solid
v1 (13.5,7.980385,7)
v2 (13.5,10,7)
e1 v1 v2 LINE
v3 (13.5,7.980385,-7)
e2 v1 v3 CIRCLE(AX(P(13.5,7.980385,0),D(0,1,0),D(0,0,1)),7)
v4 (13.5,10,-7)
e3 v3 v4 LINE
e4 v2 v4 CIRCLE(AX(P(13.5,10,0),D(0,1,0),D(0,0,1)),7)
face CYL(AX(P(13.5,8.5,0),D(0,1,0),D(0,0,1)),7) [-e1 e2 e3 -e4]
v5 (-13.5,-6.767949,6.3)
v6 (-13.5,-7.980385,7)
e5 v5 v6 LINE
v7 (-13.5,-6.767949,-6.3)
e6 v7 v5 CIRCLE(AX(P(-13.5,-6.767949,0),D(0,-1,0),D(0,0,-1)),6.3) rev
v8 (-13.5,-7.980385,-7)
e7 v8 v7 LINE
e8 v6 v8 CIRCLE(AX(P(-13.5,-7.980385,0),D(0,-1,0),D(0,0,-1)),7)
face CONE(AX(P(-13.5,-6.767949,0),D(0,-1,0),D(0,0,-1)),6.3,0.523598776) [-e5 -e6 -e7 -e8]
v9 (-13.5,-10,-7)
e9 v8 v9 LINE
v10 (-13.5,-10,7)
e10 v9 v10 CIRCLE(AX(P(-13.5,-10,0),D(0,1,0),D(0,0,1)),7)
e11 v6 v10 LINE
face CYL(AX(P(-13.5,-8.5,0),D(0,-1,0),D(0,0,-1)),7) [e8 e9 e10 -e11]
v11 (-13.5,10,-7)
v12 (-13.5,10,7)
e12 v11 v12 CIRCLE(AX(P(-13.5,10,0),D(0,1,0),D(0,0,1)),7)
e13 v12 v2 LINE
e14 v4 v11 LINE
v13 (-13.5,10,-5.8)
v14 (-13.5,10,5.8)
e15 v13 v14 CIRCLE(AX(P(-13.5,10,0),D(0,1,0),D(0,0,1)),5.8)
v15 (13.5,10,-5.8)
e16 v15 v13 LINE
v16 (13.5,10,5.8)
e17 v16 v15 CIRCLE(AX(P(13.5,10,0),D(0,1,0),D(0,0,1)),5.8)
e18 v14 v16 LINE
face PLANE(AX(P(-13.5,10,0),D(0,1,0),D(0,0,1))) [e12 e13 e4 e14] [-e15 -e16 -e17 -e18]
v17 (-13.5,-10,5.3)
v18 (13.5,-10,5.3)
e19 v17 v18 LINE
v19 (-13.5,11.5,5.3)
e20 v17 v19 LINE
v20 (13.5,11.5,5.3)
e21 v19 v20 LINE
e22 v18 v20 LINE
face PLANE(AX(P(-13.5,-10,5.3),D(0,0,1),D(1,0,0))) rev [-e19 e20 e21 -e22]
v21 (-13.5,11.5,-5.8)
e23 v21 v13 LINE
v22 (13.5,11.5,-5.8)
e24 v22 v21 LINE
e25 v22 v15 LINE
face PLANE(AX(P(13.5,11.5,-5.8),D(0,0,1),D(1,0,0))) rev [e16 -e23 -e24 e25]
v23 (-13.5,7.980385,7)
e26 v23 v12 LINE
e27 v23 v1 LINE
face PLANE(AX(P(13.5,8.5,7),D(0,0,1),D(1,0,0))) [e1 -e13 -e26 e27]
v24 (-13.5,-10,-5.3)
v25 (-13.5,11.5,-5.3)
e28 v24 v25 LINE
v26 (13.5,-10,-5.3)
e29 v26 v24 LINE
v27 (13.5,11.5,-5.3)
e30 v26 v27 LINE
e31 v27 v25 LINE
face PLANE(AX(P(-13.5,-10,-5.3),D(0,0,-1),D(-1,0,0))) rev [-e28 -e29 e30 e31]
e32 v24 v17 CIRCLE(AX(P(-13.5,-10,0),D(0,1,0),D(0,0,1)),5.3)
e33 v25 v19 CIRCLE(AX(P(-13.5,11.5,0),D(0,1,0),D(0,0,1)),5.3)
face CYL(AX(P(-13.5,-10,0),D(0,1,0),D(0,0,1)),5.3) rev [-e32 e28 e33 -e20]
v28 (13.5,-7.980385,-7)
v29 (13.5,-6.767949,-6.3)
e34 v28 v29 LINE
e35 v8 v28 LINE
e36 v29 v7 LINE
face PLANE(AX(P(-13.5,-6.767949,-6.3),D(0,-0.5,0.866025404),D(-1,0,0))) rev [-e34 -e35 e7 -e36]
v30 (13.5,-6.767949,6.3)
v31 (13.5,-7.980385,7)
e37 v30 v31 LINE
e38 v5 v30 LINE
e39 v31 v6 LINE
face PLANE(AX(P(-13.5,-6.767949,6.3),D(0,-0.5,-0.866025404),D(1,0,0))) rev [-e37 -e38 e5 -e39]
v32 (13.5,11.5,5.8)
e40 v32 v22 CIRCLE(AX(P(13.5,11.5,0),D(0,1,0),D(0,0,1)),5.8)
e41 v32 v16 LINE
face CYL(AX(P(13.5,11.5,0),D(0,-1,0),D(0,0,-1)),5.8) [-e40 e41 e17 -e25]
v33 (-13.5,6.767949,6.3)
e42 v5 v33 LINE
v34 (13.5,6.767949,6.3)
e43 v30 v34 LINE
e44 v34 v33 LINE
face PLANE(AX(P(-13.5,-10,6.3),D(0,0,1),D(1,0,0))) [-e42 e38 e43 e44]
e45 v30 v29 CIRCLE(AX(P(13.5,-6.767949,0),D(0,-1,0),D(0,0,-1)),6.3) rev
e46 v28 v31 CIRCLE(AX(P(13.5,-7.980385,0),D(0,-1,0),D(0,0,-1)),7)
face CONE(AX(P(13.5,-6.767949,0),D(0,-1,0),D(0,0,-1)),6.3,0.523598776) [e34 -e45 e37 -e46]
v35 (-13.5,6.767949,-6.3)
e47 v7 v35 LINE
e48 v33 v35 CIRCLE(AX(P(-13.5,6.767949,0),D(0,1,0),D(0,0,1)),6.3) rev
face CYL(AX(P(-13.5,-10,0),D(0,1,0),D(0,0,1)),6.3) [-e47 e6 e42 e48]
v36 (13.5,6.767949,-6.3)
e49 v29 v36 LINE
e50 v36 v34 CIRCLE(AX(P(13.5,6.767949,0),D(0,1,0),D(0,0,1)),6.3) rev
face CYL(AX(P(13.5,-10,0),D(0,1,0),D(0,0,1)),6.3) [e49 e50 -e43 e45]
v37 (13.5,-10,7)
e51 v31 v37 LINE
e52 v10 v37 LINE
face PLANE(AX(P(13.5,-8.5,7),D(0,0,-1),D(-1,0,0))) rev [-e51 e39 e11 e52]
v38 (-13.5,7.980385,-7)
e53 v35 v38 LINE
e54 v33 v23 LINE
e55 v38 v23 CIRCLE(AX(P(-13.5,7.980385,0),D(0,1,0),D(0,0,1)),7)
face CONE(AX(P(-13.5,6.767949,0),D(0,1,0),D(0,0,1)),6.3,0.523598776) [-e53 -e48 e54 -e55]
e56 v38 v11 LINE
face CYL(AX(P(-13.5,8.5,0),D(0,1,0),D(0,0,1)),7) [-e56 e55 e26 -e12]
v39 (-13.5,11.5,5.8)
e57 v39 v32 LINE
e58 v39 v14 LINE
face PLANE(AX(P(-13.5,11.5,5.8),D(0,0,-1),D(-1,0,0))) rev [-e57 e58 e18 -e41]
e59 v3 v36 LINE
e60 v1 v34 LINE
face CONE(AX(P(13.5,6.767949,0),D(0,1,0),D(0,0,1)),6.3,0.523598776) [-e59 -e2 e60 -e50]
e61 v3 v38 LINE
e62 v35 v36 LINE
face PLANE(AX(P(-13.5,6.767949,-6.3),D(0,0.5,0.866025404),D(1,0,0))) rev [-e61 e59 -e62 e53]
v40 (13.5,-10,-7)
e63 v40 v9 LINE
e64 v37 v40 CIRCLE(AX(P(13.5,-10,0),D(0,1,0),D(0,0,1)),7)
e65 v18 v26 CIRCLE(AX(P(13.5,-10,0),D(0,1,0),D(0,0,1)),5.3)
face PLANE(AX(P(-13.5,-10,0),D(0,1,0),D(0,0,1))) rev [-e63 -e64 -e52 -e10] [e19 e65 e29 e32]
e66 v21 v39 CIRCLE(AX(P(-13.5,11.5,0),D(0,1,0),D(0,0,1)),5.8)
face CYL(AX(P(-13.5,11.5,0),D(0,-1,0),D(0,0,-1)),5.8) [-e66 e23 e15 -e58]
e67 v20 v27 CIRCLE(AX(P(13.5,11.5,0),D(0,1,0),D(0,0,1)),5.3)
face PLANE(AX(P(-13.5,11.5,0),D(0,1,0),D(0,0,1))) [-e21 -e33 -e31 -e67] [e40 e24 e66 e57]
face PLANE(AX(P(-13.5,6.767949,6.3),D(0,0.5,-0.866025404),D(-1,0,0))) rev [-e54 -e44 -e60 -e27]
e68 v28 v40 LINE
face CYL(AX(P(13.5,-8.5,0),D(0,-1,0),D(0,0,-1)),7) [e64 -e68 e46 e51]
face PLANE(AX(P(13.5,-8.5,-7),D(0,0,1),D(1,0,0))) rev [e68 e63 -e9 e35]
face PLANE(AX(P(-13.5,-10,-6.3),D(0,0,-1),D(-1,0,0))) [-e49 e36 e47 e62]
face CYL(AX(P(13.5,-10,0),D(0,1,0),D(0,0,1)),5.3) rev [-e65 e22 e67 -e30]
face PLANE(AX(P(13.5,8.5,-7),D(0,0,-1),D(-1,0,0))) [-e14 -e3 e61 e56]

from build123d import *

# Parameters (mm, degrees)
BOSS_EXTRUDE1_DEPTH      = 10
BOSS_EXTRUDE1_DEPTH_BACK = 10
BOSS_EXTRUDE2_START      = -1.5
BOSS_EXTRUDE2_DEPTH      = 1.5
BOSS_EXTRUDE3_DEPTH      = 1.5
CHAMFER1_SIZE            = 1
CHAMFER1_SIZE_2          = 1.732050808


with BuildPart() as part:
    # Sketch1 → Boss-Extrude1 (new, two sides: drawn at the far end of the back side and taken through both)
    with BuildSketch(Plane(origin=(0, 0, 0), x_dir=(1, 0, 0), z_dir=(0, 1, 0)).offset(-BOSS_EXTRUDE1_DEPTH_BACK)):
        with BuildLine():
            Line((-13.5, 6.3), (13.5, 6.3))
            ThreePointArc((13.5, 6.3), (19.8, 0), (13.5, -6.3))
            Line((13.5, -6.3), (-13.5, -6.3))
            ThreePointArc((-13.5, -6.3), (-19.8, 0), (-13.5, 6.3))
        make_face()
        with BuildLine():
            Line((-13.5, 5.3), (13.5, 5.3))
            ThreePointArc((13.5, 5.3), (18.8, 0), (13.5, -5.3))
            Line((13.5, -5.3), (-13.5, -5.3))
            ThreePointArc((-13.5, -5.3), (-18.8, 0), (-13.5, 5.3))
        make_face(mode=Mode.SUBTRACT)
    extrude(amount=BOSS_EXTRUDE1_DEPTH + BOSS_EXTRUDE1_DEPTH_BACK)

    # Sketch2 → Boss-Extrude2 (add)
    with BuildSketch(Plane(origin=(0, 10, 0), x_dir=(1, 0, 0), z_dir=(0, 1, 0)).offset(BOSS_EXTRUDE2_START)):
        with BuildLine():
            Line((13.5, -7), (-13.5, -7))
            ThreePointArc((-13.5, -7), (-20.5, 0), (-13.5, 7))
            Line((-13.5, 7), (13.5, 7))
            ThreePointArc((13.5, 7), (20.5, 0), (13.5, -7))
        make_face()
        with BuildLine():
            Line((-13.5, -5.3), (13.5, -5.3))
            ThreePointArc((13.5, -5.3), (18.8, 0), (13.5, 5.3))
            Line((13.5, 5.3), (-13.5, 5.3))
            ThreePointArc((-13.5, 5.3), (-18.8, 0), (-13.5, -5.3))
        make_face(mode=Mode.SUBTRACT)
    boss_extrude2 = extrude(amount=BOSS_EXTRUDE2_DEPTH)

    # Mirror1: Boss-Extrude2 across plane
    add(boss_extrude2.mirror(Plane.ZX))

    # Sketch3 → Boss-Extrude3 (add)
    with BuildSketch(Plane(origin=(0, 10, 0), x_dir=(1, 0, 0), z_dir=(0, 1, 0))):
        with BuildLine():
            Line((-13.5, -5.8), (13.5, -5.8))
            ThreePointArc((13.5, -5.8), (19.3, 0), (13.5, 5.8))
            Line((13.5, 5.8), (-13.5, 5.8))
            ThreePointArc((-13.5, 5.8), (-19.3, 0), (-13.5, -5.8))
        make_face()
        with BuildLine():
            Line((-13.5, -5.3), (13.5, -5.3))
            ThreePointArc((13.5, -5.3), (18.8, 0), (13.5, 5.3))
            Line((13.5, 5.3), (-13.5, 5.3))
            ThreePointArc((-13.5, 5.3), (-18.8, 0), (-13.5, -5.3))
        make_face(mode=Mode.SUBTRACT)
    extrude(amount=BOSS_EXTRUDE3_DEPTH)

    # Chamfer1
    # the kernel refuses this chamfer: 1.732050808, 1 mm, written as the material it adds along each edge
    with BuildSketch(Plane(origin=(13.5, -8.5, 0), x_dir=(0, 0, -1), z_dir=(-1, 0, 0))) as chamfer1_piece_1_section:
        Polygon((6.3 + CHAMFER1_SIZE, 0), (6.3, -CHAMFER1_SIZE_2), (6.3, 0), align=None)
    chamfer1_piece_1 = revolve(axis=Axis((13.5, -8.5, 0), (0, -1, 0)), revolution_arc=180, mode=Mode.PRIVATE)
    chamfer1_piece_1 = chamfer1_piece_1 & Plane(origin=(13.5, -7.628425911, 0), x_dir=(0, 0, -1), z_dir=(0, 1, 0)) * Cylinder(7, 30, mode=Mode.PRIVATE)
    add(chamfer1_piece_1)
    with BuildSketch(Plane(origin=(13.5, -8.5, -6.3), x_dir=(0, -0.05789386240267147, -0.9983227437537926), z_dir=(-1, 0, 0))) as chamfer1_piece_2_section:
        Polygon((CHAMFER1_SIZE * 0.998322743754, -CHAMFER1_SIZE * 0.0578938624027), (-CHAMFER1_SIZE_2 * 0.0578938623883, -CHAMFER1_SIZE_2 * 0.998322743505), (0, 0), align=None)
    chamfer1_piece_2 = extrude(amount=27, mode=Mode.PRIVATE)
    chamfer1_piece_2 = split(chamfer1_piece_2, bisect_by=Plane(origin=(1.75e-07, -7.878612067, -7), z_dir=(0, 0, 1)), keep=Keep.TOP, mode=Mode.PRIVATE)
    add(chamfer1_piece_2)
    with BuildSketch(Plane(origin=(-13.5, -8.5, 6.3), x_dir=(0, -0.05789386240267147, 0.9983227437537926), z_dir=(1, 0, 0))) as chamfer1_piece_3_section:
        Polygon((CHAMFER1_SIZE * 0.998322743754, -CHAMFER1_SIZE * 0.0578938624027), (-CHAMFER1_SIZE_2 * 0.0578938623883, -CHAMFER1_SIZE_2 * 0.998322743505), (0, 0), align=None)
    chamfer1_piece_3 = extrude(amount=27, mode=Mode.PRIVATE)
    chamfer1_piece_3 = split(chamfer1_piece_3, bisect_by=Plane(origin=(-1.75e-07, -7.878612067, 7), z_dir=(0, 0, -1)), keep=Keep.TOP, mode=Mode.PRIVATE)
    add(chamfer1_piece_3)
    with BuildSketch(Plane(origin=(-13.5, -8.5, 0), x_dir=(0, 0, 1), z_dir=(1, 0, 0))) as chamfer1_piece_4_section:
        Polygon((6.3 + CHAMFER1_SIZE, 0), (6.3, -CHAMFER1_SIZE_2), (6.3, 0), align=None)
    chamfer1_piece_4 = revolve(axis=Axis((-13.5, -8.5, 0), (0, -1, 0)), revolution_arc=180, mode=Mode.PRIVATE)
    chamfer1_piece_4 = chamfer1_piece_4 & Plane(origin=(-13.5, -7.628425911, 0), x_dir=(0, 0, 1), z_dir=(0, 1, 0)) * Cylinder(7, 30, mode=Mode.PRIVATE)
    add(chamfer1_piece_4)
    with BuildSketch(Plane(origin=(13.5, 8.5, -6.3), x_dir=(0, -0.9998132206222079, 0.01932676561270069), z_dir=(-1, 0, 0))) as chamfer1_piece_5_section:
        Polygon((CHAMFER1_SIZE_2 * 0.999813220373, -CHAMFER1_SIZE_2 * 0.0193267656079), (-CHAMFER1_SIZE * 0.0193267656127, -CHAMFER1_SIZE * 0.999813220622), (0, 0), align=None)
    chamfer1_piece_5 = extrude(amount=27, mode=Mode.PRIVATE)
    chamfer1_piece_5 = split(chamfer1_piece_5, bisect_by=Plane(origin=(12.241463367, 7.814472043, -7), z_dir=(0, 0, 1)), keep=Keep.TOP, mode=Mode.PRIVATE)
    add(chamfer1_piece_5)
    with BuildSketch(Plane(origin=(13.5, 8.5, 0), x_dir=(0, 0, -1), z_dir=(-1, 0, 0))) as chamfer1_piece_6_section:
        Polygon((6.3 + CHAMFER1_SIZE, 0), (6.3, CHAMFER1_SIZE_2), (6.3, 0), align=None)
    chamfer1_piece_6 = revolve(axis=Axis((13.5, 8.5, 0), (0, -1, 0)), revolution_arc=180, mode=Mode.PRIVATE)
    chamfer1_piece_6 = chamfer1_piece_6 & Plane(origin=(13.5, 7.628425911, 0), x_dir=(0, 0, -1), z_dir=(0, -1, 0)) * Cylinder(7, 30, mode=Mode.PRIVATE)
    add(chamfer1_piece_6)
    with BuildSketch(Plane(origin=(-13.5, 8.5, 0), x_dir=(0, 0, 1), z_dir=(1, 0, 0))) as chamfer1_piece_7_section:
        Polygon((6.3 + CHAMFER1_SIZE, 0), (6.3, CHAMFER1_SIZE_2), (6.3, 0), align=None)
    chamfer1_piece_7 = revolve(axis=Axis((-13.5, 8.5, 0), (0, -1, 0)), revolution_arc=180, mode=Mode.PRIVATE)
    chamfer1_piece_7 = chamfer1_piece_7 & Plane(origin=(-13.5, 7.628425911, 0), x_dir=(0, 0, 1), z_dir=(0, -1, 0)) * Cylinder(7, 30, mode=Mode.PRIVATE)
    add(chamfer1_piece_7)
    with BuildSketch(Plane(origin=(-13.5, 8.5, 6.3), x_dir=(0, 0.05789386240267147, 0.9983227437537926), z_dir=(1, 0, 0))) as chamfer1_piece_8_section:
        Polygon((CHAMFER1_SIZE * 0.998322743754, CHAMFER1_SIZE * 0.0578938624027), (-CHAMFER1_SIZE_2 * 0.0578938623883, CHAMFER1_SIZE_2 * 0.998322743505), (0, 0), align=None)
    chamfer1_piece_8 = extrude(amount=27, mode=Mode.PRIVATE)
    chamfer1_piece_8 = split(chamfer1_piece_8, bisect_by=Plane(origin=(-1.75e-07, 7.878612067, 7), z_dir=(0, 0, -1)), keep=Keep.TOP, mode=Mode.PRIVATE)
    add(chamfer1_piece_8)


solid = part.part
